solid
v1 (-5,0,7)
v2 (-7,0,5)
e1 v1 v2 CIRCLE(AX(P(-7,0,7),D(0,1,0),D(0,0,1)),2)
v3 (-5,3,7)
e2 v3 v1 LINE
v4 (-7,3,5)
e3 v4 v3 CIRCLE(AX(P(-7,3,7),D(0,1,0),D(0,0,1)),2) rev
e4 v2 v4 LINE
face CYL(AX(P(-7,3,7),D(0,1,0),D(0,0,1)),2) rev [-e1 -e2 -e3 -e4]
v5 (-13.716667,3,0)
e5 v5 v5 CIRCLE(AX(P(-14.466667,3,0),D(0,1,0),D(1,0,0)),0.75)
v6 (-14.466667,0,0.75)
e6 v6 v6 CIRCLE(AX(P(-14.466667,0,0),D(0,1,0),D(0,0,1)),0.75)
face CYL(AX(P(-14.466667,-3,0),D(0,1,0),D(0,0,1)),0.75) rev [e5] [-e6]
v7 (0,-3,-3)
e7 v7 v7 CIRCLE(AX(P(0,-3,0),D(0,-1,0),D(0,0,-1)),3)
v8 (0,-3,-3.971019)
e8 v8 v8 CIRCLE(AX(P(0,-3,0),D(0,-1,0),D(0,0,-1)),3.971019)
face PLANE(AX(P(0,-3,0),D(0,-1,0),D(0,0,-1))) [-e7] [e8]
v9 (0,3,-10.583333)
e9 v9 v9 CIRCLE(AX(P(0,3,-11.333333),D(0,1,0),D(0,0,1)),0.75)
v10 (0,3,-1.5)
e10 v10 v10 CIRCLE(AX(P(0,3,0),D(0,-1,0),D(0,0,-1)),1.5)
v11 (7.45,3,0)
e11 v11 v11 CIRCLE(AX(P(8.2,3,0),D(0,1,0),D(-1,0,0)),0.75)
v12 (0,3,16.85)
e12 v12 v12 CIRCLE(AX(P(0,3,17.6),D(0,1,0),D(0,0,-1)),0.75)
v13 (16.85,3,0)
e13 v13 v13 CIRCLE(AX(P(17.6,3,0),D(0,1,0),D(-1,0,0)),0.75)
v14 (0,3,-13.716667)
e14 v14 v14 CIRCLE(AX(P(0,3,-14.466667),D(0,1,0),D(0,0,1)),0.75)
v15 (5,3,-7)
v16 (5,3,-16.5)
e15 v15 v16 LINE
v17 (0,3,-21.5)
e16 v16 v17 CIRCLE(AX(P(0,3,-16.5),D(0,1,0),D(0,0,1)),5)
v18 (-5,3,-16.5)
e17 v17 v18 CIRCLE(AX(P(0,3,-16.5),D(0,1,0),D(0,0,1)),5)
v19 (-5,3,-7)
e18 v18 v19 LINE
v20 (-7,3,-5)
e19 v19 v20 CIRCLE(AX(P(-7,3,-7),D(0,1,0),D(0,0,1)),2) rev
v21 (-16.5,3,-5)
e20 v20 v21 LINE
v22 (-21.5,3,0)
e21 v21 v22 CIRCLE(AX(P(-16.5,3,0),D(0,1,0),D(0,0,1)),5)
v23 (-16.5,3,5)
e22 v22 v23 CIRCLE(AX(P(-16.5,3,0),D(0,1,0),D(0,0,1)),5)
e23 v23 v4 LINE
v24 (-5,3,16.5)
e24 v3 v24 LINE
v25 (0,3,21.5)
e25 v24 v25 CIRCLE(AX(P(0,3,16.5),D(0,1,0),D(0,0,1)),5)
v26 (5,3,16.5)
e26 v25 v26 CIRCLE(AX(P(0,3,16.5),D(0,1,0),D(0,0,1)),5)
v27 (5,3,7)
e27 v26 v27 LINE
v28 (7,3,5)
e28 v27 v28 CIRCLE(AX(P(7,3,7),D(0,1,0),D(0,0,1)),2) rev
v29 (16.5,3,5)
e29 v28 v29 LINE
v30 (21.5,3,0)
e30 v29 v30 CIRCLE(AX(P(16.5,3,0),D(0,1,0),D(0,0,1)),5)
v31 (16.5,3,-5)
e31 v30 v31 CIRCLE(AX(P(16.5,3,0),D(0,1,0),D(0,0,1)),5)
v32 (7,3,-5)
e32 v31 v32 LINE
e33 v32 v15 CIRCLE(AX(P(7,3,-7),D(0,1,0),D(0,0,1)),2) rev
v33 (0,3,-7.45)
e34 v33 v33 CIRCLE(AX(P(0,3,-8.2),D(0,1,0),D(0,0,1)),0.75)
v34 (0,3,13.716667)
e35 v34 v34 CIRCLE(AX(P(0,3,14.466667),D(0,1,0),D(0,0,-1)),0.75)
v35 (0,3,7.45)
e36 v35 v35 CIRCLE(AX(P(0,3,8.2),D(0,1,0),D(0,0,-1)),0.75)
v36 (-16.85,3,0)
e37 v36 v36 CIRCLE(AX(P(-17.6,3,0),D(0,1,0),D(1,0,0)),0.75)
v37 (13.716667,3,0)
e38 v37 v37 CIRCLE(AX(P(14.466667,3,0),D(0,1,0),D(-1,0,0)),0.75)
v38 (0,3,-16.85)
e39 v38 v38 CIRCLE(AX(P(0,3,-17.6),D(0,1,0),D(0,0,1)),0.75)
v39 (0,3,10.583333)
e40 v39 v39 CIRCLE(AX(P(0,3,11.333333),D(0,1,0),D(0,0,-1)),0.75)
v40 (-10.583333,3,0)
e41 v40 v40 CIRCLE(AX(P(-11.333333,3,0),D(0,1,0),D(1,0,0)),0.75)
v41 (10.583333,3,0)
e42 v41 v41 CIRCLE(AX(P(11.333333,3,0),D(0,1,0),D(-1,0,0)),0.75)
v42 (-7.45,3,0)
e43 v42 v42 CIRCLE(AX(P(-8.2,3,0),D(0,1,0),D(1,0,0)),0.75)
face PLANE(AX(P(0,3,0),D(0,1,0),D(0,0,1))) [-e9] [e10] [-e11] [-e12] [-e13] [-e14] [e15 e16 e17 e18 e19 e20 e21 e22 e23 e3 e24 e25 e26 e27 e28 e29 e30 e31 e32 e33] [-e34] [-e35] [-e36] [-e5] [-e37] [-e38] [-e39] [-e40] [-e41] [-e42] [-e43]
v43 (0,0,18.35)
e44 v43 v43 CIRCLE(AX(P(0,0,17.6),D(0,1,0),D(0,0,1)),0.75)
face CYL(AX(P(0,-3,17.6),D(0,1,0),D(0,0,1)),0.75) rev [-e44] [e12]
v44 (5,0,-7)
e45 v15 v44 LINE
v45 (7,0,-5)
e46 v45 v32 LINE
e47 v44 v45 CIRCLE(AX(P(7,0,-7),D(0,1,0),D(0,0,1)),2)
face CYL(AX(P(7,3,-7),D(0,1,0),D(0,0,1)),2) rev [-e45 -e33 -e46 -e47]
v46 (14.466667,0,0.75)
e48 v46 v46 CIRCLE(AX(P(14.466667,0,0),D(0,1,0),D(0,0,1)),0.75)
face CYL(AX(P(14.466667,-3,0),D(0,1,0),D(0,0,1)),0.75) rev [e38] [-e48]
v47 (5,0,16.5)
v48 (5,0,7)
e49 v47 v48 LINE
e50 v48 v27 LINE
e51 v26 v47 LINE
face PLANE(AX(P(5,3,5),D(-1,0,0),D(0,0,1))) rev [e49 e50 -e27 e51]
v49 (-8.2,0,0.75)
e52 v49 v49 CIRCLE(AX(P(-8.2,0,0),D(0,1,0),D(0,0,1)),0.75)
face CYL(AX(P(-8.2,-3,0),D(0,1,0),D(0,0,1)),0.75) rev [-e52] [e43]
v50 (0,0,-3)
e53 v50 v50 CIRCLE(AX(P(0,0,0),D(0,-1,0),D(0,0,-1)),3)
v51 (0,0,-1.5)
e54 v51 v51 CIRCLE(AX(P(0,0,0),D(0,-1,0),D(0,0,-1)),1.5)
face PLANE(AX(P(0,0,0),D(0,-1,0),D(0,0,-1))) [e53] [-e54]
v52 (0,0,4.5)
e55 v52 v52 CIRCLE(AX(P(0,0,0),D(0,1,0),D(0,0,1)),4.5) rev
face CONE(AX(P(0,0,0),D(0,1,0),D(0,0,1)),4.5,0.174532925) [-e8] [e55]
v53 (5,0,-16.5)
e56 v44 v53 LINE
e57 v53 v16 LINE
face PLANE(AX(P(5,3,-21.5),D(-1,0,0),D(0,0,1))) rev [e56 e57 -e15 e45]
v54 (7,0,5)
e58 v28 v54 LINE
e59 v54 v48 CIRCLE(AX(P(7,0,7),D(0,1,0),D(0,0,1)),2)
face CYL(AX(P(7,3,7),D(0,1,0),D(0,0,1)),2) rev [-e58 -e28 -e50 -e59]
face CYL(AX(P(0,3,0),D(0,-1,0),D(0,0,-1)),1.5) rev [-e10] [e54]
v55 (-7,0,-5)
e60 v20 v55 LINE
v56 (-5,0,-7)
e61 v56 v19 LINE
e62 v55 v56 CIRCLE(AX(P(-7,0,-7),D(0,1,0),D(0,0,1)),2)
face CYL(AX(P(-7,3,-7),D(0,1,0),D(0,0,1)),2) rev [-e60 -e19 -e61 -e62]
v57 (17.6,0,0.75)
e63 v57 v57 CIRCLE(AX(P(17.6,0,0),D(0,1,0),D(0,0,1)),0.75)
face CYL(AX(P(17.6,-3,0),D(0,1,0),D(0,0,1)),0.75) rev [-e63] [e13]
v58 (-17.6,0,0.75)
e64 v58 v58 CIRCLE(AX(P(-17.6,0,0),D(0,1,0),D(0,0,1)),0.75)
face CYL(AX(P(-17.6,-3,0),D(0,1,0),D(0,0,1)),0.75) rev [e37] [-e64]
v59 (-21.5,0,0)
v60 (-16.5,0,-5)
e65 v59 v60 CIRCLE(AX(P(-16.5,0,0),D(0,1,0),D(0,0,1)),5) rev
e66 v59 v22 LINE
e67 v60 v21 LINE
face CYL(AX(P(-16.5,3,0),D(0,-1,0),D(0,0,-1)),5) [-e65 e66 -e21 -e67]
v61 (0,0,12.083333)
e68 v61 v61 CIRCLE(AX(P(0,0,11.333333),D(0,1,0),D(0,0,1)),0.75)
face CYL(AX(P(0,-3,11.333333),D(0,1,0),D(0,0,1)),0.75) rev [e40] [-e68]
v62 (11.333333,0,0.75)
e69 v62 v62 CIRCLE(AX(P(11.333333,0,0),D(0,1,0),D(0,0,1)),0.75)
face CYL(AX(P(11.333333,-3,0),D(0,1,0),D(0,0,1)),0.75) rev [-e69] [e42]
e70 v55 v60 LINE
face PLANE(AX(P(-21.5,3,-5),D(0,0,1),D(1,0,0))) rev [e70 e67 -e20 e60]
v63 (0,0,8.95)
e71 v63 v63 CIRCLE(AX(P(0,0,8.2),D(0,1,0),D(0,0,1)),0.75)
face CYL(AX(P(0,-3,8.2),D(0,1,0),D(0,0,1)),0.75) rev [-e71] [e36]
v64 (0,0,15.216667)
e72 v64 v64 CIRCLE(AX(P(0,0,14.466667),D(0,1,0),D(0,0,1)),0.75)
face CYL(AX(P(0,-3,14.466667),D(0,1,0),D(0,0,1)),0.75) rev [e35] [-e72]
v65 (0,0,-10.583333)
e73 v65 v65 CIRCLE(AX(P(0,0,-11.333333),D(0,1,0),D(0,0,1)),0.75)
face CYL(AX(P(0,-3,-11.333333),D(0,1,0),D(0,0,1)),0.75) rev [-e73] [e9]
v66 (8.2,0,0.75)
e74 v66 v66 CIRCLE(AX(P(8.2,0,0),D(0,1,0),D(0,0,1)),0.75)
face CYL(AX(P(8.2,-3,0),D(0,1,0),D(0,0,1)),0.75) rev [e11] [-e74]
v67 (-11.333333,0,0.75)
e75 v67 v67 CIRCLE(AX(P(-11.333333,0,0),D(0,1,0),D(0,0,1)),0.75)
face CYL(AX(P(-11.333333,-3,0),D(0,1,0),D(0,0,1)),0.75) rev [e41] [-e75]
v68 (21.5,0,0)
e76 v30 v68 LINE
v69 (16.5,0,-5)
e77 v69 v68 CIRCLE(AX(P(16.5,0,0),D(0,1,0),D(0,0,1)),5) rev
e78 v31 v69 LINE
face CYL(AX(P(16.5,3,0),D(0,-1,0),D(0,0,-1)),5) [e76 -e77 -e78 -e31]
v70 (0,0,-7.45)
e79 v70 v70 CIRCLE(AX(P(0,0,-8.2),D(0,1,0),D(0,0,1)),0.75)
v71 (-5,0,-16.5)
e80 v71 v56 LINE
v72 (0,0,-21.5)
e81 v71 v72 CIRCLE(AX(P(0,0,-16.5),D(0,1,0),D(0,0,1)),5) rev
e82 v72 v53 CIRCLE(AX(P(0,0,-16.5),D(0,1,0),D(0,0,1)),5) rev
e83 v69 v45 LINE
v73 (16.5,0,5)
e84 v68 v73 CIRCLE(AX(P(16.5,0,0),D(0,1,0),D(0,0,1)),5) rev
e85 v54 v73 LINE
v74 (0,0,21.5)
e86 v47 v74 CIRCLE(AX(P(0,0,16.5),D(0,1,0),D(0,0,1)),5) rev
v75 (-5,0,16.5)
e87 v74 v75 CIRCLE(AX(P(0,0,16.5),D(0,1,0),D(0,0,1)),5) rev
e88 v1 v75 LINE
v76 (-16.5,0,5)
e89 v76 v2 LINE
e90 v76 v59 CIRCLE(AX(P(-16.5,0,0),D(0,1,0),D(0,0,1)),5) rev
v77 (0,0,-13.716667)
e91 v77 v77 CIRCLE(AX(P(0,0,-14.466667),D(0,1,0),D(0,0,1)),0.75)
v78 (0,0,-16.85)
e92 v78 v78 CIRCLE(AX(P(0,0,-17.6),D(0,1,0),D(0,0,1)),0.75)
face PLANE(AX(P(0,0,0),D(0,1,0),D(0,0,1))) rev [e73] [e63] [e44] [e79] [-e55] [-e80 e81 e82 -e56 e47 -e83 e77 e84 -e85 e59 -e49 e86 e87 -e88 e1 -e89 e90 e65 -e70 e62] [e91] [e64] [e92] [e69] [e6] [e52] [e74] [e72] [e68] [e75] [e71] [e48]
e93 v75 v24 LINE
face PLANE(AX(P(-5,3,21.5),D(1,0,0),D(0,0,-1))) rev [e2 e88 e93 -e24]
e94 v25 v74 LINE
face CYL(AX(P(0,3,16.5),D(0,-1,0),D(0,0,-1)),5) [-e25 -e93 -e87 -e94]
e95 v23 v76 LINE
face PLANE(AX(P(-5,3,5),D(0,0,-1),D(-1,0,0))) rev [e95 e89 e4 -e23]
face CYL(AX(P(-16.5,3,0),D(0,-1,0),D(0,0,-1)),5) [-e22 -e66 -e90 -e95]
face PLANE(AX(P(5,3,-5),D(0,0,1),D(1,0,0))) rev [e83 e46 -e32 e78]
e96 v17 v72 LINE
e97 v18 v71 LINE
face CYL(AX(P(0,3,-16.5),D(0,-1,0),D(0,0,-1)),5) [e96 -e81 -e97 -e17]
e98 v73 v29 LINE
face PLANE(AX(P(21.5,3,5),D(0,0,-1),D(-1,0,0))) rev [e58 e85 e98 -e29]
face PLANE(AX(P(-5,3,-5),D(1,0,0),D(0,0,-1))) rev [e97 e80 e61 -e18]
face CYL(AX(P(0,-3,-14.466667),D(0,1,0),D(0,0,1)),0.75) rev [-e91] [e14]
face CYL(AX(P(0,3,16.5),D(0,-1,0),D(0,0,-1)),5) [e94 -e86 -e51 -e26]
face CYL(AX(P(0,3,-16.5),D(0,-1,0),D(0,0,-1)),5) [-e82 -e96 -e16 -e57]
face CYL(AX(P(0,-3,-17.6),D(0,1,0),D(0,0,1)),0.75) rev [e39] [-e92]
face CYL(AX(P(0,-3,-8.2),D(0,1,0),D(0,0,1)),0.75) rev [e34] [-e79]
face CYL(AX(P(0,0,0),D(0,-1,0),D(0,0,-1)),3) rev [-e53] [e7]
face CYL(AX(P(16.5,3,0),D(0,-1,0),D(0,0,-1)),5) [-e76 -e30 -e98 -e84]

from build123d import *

# Parameters (mm, degrees)
BOSS_EXTRUDE1_DEPTH = 3
FILLET1_R           = 2
FILLET2_R           = 5
SKETCH2_R           = 4.5
BOSS_EXTRUDE2_DEPTH = 3
DRAFT1_ANGLE        = 10
SKETCH3_R           = 3
CUT_EXTRUDE1_DEPTH  = 3
SKETCH4_R           = 1.5
CUT_EXTRUDE2_DEPTH  = 31.553232235
SKETCH5_R           = 0.75
CUT_EXTRUDE3_DEPTH  = 31.991934435
CIRPATTERN1_COUNT   = 4


with BuildPart() as part:
    # Sketch1 → Boss-Extrude1 (new body)
    with BuildSketch(Plane(origin=(0, 0, 0), x_dir=(1, 0, 0), z_dir=(0, 1, 0))):
        Polygon((-5, 5), (-5, 21.5), (5, 21.5), (5, 5), (21.5, 5), (21.5, -5), (5, -5), (5, -21.5), (-5, -21.5), (-5, -5), (-21.5, -5), (-21.5, 5), align=None)
    extrude(amount=BOSS_EXTRUDE1_DEPTH)

    # Fillet1
    fillet1_edges = [part.edges().sort_by_distance(p)[0] for p in [
        (-5, 1.5, -5),
        (5, 1.5, -5),
        (5, 1.5, 5),
        (-5, 1.5, 5),
    ]]
    fillet(fillet1_edges, radius=FILLET1_R)

    # Fillet2
    fillet2_edges = [part.edges().sort_by_distance(p)[0] for p in [
        (-21.5, 1.5, -5),
        (-5, 1.5, -21.5),
        (-21.5, 1.5, 5),
        (5, 1.5, -21.5),
        (21.5, 1.5, -5),
        (21.5, 1.5, 5),
        (5, 1.5, 21.5),
        (-5, 1.5, 21.5),
    ]]
    fillet(fillet2_edges, radius=FILLET2_R - 0.0001)  # a hair under: the kernel refuses the full size

    # Sketch2 → Boss-Extrude2 (add)
    with BuildSketch(Plane.XZ):
        with Locations(Location((0, 0, 0), (0, 0, 90))):
            Circle(SKETCH2_R)
    extrude(amount=BOSS_EXTRUDE2_DEPTH)

    # Draft1
    draft1_faces = [part.faces().sort_by_distance(p)[0] for p in [
        (0, -1.5, -4.5),
    ]]
    draft(draft1_faces, Plane(origin=(0, 0, 0), x_dir=(0, 0, -1), z_dir=(0, -1, 0)), DRAFT1_ANGLE)

    # Sketch3 → Cut-Extrude1 (cut)
    with BuildSketch(Plane.XZ.offset(3)):
        with Locations(Location((0, 0, 0), (0, 0, 270))):
            Circle(SKETCH3_R)
    extrude(amount=-CUT_EXTRUDE1_DEPTH, mode=Mode.SUBTRACT)

    # Sketch4 → Cut-Extrude2 (cut, through all)
    with BuildSketch(Plane.XZ):
        with Locations(Location((0, 0, 0), (0, 0, 270))):
            Circle(SKETCH4_R)
    extrude(amount=-CUT_EXTRUDE2_DEPTH, mode=Mode.SUBTRACT)

    # Sketch5 → Cut-Extrude3 (cut, through all)
    with BuildSketch(Plane(origin=(0, 3, 0), x_dir=(1, 0, 0), z_dir=(0, 1, 0))):
        with Locations(Location((0, 17.6, 0), (0, 0, 270))):
            Circle(SKETCH5_R)
        with Locations(Location((0, 14.466666667, 0), (0, 0, 270))):
            Circle(SKETCH5_R)
        with Locations(Location((0, 11.333333333, 0), (0, 0, 270))):
            Circle(SKETCH5_R)
        with Locations(Location((0, 8.2, 0), (0, 0, 270))):
            Circle(SKETCH5_R)
    cut_extrude3 = extrude(amount=-CUT_EXTRUDE3_DEPTH, mode=Mode.SUBTRACT)

    # CirPattern1: Cut-Extrude3 ×4 about axis
    cirpattern1_axis = Axis((0, 0, 0), (0, 1, 0))
    for i in range(1, CIRPATTERN1_COUNT):
        add(cut_extrude3.rotate(cirpattern1_axis, i * 360 / CIRPATTERN1_COUNT), mode=Mode.SUBTRACT)


solid = part.part
